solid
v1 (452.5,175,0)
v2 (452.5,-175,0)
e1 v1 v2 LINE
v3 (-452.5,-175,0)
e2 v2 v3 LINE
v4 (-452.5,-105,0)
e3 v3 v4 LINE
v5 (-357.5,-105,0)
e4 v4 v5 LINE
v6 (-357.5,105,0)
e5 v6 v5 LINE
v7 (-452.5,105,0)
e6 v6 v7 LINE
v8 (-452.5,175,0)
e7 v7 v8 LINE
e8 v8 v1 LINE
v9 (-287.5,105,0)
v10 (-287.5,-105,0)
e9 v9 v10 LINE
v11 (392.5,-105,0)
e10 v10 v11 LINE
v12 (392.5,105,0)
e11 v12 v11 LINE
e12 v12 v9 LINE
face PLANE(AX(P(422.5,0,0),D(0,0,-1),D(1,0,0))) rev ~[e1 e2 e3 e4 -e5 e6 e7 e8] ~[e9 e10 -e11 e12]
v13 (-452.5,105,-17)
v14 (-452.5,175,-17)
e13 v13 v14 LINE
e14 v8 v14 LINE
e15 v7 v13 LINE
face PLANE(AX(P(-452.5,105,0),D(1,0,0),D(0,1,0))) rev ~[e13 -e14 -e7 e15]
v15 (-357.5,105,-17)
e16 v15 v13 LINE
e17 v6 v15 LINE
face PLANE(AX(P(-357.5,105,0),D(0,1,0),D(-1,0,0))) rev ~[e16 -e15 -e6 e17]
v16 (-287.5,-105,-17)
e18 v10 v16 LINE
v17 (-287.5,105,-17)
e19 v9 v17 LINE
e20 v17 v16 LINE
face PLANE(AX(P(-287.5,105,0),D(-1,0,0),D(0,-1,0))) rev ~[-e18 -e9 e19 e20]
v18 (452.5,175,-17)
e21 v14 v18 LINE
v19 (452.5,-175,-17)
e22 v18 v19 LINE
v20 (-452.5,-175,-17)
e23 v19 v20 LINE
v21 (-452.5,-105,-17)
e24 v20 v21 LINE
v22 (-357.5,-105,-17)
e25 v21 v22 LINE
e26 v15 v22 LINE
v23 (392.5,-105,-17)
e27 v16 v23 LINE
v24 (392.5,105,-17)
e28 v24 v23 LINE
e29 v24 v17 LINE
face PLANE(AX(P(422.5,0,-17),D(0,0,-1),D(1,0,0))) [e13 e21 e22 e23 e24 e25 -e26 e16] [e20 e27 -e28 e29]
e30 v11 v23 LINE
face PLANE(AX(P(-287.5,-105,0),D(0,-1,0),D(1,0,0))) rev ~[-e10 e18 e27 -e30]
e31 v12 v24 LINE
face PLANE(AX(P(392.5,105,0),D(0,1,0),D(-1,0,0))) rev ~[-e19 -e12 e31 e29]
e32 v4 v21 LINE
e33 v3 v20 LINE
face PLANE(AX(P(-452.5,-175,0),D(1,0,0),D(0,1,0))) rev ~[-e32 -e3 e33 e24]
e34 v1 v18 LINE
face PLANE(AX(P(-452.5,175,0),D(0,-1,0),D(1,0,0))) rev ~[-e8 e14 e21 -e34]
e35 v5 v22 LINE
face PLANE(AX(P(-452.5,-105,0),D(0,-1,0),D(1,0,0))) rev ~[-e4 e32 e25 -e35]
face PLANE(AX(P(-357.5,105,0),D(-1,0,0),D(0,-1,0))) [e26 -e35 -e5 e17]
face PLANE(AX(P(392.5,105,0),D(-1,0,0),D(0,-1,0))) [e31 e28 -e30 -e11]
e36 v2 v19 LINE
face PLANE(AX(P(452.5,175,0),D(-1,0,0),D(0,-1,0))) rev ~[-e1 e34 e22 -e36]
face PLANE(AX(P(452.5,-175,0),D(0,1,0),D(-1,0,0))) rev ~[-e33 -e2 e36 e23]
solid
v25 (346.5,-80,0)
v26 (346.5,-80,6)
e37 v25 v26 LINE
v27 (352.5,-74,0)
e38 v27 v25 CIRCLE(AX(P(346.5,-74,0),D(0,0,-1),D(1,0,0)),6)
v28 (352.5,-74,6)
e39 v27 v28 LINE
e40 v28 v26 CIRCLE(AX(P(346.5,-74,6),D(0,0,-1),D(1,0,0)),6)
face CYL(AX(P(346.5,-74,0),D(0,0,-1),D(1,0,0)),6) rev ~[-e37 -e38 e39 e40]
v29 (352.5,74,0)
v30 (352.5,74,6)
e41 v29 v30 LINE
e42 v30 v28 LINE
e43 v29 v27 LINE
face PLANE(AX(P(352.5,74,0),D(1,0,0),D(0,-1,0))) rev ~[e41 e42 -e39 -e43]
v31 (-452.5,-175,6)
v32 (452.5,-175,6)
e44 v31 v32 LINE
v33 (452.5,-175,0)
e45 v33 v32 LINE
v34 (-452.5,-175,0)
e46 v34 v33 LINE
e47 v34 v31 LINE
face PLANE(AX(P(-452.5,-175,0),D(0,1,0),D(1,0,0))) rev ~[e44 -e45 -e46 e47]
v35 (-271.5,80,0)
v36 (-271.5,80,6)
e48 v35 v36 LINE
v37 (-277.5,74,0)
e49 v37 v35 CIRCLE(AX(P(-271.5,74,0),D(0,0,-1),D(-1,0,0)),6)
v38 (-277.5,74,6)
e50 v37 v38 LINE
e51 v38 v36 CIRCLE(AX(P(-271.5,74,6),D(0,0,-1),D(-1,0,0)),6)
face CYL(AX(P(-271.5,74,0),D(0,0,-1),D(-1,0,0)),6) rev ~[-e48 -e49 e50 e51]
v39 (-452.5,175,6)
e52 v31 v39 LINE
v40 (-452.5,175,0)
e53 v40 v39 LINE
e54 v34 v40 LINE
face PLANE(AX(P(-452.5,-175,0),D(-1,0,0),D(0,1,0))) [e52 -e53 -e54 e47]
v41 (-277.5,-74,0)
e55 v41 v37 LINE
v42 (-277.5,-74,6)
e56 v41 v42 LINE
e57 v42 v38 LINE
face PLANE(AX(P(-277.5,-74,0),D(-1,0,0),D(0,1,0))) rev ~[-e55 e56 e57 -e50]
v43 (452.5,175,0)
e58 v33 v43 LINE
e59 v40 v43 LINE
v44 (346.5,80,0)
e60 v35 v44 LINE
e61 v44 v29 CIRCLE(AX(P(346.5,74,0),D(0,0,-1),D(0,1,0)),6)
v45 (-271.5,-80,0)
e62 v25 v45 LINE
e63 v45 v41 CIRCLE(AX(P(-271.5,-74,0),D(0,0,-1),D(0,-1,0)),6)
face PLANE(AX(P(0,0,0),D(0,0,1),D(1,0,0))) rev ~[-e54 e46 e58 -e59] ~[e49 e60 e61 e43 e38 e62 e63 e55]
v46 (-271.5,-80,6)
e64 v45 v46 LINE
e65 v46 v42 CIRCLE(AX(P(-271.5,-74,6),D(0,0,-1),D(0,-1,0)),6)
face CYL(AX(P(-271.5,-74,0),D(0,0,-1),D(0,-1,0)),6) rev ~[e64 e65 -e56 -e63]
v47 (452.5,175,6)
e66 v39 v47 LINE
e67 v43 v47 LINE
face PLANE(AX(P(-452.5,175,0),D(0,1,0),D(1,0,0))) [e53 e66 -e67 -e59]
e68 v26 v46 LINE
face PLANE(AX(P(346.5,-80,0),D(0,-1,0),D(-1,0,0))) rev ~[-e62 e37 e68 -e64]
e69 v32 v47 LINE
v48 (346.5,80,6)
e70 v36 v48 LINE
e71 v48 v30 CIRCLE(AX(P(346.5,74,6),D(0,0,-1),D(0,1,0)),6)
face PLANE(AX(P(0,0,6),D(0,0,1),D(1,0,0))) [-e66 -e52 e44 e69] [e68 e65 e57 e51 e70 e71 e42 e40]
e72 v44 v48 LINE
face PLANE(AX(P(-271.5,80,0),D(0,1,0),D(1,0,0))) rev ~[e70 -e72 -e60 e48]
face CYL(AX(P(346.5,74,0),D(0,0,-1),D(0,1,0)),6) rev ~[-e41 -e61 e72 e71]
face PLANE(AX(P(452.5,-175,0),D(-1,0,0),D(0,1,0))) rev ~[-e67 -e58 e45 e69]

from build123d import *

# Parameters (mm, degrees)
F0_W     = 905
F0_H     = 350
F1_DEPTH = 6
F2_W     = 60
F2_H     = 210
F2_W_2   = 70
F3_DEPTH = 17


# Not quite as in the source:
# - a feature of the source that left no trace in its solid (it failed there, or was rolled back) is left out


with BuildPart() as f1:
    # F0 (on Top) → F1 (new body)
    with BuildSketch(Plane.XY):
        Rectangle(F0_W, F0_H)
        with BuildLine():
            ThreePointArc((-277.5, 74), (-275.7426406871, 78.2426406871), (-271.5, 80))
            Line((-271.5, 80), (346.5, 80))
            ThreePointArc((346.5, 80), (350.7426406871, 78.2426406871), (352.5, 74))
            Line((352.5, 74), (352.5, -74))
            ThreePointArc((352.5, -74), (350.7426406871, -78.2426406871), (346.5, -80))
            Line((346.5, -80), (-271.5, -80))
            ThreePointArc((-271.5, -80), (-275.7426406871, -78.2426406871), (-277.5, -74))
            Line((-277.5, -74), (-277.5, 74))
        make_face(mode=Mode.SUBTRACT)
    extrude(amount=F1_DEPTH)


with BuildPart() as f3:
    # F2 (on face) → F3 (new body)
    with BuildSketch(Plane(origin=(0, 0, 0), x_dir=(1, 0, 0), z_dir=(0, 0, -1))):
        with Locations((422.5, 0)):
            Rectangle(F2_W, F2_H)
        Polygon((452.5, 175), (-452.5, 175), (-452.5, 105), (-357.5, 105), (-287.5, 105), (392.5, 105), (452.5, 105), align=None)
        Polygon((-357.5, -105), (-452.5, -105), (-452.5, -175), (452.5, -175), (452.5, -105), (392.5, -105), (-287.5, -105), align=None)
        with Locations((-322.5, 0)):
            Rectangle(F2_W_2, F2_H)
    extrude(amount=F3_DEPTH)


solid = Compound([f1.part, f3.part])
